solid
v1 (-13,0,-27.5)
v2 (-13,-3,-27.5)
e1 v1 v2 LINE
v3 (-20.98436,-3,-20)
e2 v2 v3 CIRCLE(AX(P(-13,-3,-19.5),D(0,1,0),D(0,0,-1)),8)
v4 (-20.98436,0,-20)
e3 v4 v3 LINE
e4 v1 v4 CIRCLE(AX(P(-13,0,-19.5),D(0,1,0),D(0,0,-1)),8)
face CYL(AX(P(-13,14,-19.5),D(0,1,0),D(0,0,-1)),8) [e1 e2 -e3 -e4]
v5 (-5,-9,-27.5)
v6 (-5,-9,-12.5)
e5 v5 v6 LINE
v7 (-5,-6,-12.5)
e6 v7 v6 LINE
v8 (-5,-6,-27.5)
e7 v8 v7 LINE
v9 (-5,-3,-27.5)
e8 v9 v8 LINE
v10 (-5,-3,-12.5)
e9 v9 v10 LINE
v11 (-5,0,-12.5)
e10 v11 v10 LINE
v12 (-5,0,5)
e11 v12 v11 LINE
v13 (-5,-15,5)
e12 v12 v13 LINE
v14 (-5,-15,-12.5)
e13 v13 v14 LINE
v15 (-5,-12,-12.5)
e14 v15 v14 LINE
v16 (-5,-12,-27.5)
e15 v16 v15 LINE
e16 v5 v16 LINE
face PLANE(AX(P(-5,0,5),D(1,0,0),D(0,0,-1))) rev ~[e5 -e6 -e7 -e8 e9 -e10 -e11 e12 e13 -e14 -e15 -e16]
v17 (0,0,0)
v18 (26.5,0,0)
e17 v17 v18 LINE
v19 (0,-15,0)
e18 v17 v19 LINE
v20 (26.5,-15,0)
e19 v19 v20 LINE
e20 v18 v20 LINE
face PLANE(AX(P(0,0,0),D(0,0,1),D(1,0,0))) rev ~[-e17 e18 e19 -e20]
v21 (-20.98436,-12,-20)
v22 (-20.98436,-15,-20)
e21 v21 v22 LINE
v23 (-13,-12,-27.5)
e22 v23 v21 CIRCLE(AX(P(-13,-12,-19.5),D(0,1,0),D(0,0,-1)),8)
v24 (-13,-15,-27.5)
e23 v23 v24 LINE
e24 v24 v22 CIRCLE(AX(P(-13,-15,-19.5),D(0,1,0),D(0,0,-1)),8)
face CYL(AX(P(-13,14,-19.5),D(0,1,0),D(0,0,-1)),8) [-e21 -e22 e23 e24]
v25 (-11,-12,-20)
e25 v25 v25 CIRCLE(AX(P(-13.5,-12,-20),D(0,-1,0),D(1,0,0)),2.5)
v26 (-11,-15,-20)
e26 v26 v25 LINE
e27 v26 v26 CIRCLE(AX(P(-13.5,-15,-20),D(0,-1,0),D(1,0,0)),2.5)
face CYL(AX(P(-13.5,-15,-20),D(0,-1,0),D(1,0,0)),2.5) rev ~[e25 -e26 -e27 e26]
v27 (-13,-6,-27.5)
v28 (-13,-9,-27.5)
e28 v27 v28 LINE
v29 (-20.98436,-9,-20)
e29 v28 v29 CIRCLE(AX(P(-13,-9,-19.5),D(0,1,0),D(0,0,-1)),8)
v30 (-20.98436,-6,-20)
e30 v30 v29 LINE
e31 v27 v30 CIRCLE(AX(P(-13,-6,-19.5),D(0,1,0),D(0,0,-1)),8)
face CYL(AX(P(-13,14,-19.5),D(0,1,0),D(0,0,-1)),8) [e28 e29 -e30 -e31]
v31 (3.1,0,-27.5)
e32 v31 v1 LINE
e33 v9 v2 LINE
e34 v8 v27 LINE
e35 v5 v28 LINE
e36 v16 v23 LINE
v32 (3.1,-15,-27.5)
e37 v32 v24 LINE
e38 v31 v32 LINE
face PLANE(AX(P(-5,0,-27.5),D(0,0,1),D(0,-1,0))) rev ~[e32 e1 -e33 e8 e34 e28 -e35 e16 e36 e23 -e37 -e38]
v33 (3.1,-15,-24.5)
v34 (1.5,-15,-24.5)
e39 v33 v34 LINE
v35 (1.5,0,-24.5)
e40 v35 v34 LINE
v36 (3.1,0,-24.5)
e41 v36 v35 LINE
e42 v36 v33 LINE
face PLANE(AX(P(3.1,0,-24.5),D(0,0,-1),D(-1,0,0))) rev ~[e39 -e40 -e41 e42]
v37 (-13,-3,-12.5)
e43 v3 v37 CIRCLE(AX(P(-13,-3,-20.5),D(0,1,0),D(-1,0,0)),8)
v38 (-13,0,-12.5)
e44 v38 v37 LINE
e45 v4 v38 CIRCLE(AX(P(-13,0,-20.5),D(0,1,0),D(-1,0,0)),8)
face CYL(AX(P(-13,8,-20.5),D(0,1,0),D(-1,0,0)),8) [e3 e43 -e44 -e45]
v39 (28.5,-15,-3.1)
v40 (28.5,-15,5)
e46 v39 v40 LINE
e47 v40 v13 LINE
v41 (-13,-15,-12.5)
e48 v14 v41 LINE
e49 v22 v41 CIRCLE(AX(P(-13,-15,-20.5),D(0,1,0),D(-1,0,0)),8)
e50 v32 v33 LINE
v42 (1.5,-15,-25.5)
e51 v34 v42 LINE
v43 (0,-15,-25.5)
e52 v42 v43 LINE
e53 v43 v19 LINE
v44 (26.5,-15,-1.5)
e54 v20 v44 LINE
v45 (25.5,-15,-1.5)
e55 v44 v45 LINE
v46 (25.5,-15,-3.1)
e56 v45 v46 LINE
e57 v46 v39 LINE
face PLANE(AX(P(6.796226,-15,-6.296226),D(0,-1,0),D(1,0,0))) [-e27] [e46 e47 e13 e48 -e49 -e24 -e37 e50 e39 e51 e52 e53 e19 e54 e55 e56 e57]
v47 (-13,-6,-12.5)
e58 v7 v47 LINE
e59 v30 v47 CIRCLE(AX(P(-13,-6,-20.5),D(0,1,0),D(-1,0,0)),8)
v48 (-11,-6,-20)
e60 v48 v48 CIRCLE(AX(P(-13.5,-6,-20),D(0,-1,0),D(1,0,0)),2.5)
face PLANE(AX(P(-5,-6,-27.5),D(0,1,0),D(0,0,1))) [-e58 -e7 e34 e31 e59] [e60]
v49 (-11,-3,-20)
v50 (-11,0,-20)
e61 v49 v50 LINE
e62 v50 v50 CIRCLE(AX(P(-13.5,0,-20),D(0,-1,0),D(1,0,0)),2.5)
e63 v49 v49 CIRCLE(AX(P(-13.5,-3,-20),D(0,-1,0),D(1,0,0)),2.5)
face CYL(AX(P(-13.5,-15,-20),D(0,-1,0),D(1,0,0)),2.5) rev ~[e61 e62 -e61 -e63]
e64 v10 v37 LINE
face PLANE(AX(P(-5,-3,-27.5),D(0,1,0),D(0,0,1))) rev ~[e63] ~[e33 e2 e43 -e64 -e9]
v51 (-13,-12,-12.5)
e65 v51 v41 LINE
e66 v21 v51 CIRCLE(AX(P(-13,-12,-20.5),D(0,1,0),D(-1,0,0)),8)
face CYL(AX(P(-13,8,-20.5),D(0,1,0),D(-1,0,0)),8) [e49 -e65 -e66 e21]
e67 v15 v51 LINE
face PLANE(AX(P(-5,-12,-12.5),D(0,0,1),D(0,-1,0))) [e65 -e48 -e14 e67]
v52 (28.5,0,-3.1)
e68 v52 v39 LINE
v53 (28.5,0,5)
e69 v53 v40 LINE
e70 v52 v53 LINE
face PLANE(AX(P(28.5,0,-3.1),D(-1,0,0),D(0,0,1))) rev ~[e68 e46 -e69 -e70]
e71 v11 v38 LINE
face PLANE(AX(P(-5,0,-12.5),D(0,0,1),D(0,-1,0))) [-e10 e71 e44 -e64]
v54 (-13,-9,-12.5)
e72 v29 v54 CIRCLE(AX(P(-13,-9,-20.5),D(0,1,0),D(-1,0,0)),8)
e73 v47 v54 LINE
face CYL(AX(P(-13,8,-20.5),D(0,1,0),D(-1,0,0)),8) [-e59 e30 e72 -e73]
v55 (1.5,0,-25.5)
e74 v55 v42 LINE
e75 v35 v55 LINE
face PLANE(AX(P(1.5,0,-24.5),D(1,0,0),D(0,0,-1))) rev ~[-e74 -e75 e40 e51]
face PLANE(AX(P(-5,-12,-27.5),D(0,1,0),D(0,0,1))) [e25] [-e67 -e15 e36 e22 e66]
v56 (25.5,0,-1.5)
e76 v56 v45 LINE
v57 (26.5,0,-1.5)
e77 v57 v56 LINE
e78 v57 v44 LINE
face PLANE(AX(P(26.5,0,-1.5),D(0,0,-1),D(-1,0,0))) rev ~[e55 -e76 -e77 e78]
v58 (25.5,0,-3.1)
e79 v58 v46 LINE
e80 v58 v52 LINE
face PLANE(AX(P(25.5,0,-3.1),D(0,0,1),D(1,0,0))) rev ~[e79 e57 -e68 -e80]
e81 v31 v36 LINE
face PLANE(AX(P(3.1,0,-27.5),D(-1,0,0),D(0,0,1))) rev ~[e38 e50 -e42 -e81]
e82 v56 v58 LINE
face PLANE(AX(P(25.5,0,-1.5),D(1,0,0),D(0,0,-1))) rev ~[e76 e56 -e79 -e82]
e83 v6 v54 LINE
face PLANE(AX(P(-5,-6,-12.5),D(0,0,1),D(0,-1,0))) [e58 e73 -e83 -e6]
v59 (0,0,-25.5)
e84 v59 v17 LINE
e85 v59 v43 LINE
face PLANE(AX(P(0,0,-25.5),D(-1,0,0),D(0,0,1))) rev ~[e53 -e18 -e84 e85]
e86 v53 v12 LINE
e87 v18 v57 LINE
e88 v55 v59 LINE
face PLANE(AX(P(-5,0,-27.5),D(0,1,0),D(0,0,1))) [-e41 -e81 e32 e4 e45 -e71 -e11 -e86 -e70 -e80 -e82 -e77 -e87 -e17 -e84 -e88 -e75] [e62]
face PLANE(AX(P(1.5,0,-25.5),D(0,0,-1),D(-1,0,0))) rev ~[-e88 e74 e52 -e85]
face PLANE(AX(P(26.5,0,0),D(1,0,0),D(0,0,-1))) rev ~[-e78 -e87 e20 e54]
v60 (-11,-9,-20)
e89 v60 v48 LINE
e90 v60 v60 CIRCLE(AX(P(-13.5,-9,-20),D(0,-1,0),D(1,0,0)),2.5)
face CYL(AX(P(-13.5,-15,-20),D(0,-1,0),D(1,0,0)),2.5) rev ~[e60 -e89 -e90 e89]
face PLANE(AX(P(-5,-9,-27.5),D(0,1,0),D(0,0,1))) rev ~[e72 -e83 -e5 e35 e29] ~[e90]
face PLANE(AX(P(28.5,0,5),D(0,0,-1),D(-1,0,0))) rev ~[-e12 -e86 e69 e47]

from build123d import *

# Parameters (mm, degrees)
F1_DEPTH    = 15
F2_W        = 3
F2_H        = 15
F3_DEPTH    = 16
F5_DEPTH    = 25
F6_T1_DEPTH = 43
F6_T3_DEPTH = 43
F6_T5_DEPTH = 43


# Not quite as in the source:
# - a fillet or chamfer that OpenCascade refuses, or shapes differently, is made with other operations: its cross-section is extruded or revolved along the edge and cut away or added


with BuildPart() as f1:
    # F0 (on Front) → F1 (new body)
    with BuildSketch(Plane.XZ):
        Polygon((0, -23.585311383), (0, 0), (25, 0), (26.5, 0), (26.5, -1.5), (25.5, -1.5), (25.5, -3.1), (28.5, -3.1), (28.5, 5), (25, 5), (-5, 5), (-5, -24), (-5, -25.5), (-5, -27.5), (0, -27.5), (3.1, -27.5), (3.1, -24.5), (1.5, -24.5), (1.5, -25.5), (0, -25.5), (0, -25.085311383), align=None)
    extrude(amount=F1_DEPTH)

    # F2 (on face) → F3 (join)
    with BuildSketch(Plane(origin=(-5, 0, 0), x_dir=(0, -1, 0), z_dir=(-1, 0, 0))):
        with Locations((1.5, -20)):
            Rectangle(F2_W, F2_H)
        with Locations((7.5, -20)):
            Rectangle(F2_W, F2_H)
        with Locations((13.5, -20)):
            Rectangle(F2_W, F2_H)
    extrude(amount=F3_DEPTH)

    # F4 (on face) → F5 (cut)
    with BuildSketch(Plane.XZ.offset(15)):
        with BuildLine():
            ThreePointArc((-16, -20), (-13.5, -22.5), (-11, -20))
            ThreePointArc((-11, -20), (-13.5, -17.5), (-16, -20))
        make_face()
    extrude(amount=-F5_DEPTH, mode=Mode.SUBTRACT)

    # F6: fillet of radius 8 on 5 edges, made by hand

    # F6_s2 → F6_t1 (cut)
    with BuildSketch(Plane.XZ.offset(-8)):
        with BuildLine():
            ThreePointArc((-21, -20.5), (-18.6568542495, -14.8431457505), (-13, -12.5))
            Line((-13, -12.5), (-21, -12.5))
            Line((-21, -12.5), (-21, -20.5))
        make_face()
    extrude(amount=F6_T1_DEPTH, mode=Mode.SUBTRACT)

    # F6_s4 → F6_t3 (cut)
    with BuildSketch(Plane.XZ.offset(-14)):
        with BuildLine():
            ThreePointArc((-21, -20.5), (-18.6568542495, -14.8431457505), (-13, -12.5))
            Line((-13, -12.5), (-21, -12.5))
            Line((-21, -12.5), (-21, -20.5))
        make_face()
        with BuildLine():
            ThreePointArc((-13, -27.5), (-18.6568542495, -25.1568542495), (-21, -19.5))
            Line((-21, -19.5), (-21, -27.5))
            Line((-21, -27.5), (-13, -27.5))
        make_face()
    extrude(amount=F6_T3_DEPTH, mode=Mode.SUBTRACT)

    # F6_s6 → F6_t5 (cut)
    with BuildSketch(Plane.XZ.offset(-20)):
        with BuildLine():
            ThreePointArc((-21, -20.5), (-18.6568542495, -14.8431457505), (-13, -12.5))
            Line((-13, -12.5), (-21, -12.5))
            Line((-21, -12.5), (-21, -20.5))
        make_face()
        with BuildLine():
            ThreePointArc((-13, -27.5), (-18.6568542495, -25.1568542495), (-21, -19.5))
            Line((-21, -19.5), (-21, -27.5))
            Line((-21, -27.5), (-13, -27.5))
        make_face()
    extrude(amount=F6_T5_DEPTH, mode=Mode.SUBTRACT)


solid = f1.part
